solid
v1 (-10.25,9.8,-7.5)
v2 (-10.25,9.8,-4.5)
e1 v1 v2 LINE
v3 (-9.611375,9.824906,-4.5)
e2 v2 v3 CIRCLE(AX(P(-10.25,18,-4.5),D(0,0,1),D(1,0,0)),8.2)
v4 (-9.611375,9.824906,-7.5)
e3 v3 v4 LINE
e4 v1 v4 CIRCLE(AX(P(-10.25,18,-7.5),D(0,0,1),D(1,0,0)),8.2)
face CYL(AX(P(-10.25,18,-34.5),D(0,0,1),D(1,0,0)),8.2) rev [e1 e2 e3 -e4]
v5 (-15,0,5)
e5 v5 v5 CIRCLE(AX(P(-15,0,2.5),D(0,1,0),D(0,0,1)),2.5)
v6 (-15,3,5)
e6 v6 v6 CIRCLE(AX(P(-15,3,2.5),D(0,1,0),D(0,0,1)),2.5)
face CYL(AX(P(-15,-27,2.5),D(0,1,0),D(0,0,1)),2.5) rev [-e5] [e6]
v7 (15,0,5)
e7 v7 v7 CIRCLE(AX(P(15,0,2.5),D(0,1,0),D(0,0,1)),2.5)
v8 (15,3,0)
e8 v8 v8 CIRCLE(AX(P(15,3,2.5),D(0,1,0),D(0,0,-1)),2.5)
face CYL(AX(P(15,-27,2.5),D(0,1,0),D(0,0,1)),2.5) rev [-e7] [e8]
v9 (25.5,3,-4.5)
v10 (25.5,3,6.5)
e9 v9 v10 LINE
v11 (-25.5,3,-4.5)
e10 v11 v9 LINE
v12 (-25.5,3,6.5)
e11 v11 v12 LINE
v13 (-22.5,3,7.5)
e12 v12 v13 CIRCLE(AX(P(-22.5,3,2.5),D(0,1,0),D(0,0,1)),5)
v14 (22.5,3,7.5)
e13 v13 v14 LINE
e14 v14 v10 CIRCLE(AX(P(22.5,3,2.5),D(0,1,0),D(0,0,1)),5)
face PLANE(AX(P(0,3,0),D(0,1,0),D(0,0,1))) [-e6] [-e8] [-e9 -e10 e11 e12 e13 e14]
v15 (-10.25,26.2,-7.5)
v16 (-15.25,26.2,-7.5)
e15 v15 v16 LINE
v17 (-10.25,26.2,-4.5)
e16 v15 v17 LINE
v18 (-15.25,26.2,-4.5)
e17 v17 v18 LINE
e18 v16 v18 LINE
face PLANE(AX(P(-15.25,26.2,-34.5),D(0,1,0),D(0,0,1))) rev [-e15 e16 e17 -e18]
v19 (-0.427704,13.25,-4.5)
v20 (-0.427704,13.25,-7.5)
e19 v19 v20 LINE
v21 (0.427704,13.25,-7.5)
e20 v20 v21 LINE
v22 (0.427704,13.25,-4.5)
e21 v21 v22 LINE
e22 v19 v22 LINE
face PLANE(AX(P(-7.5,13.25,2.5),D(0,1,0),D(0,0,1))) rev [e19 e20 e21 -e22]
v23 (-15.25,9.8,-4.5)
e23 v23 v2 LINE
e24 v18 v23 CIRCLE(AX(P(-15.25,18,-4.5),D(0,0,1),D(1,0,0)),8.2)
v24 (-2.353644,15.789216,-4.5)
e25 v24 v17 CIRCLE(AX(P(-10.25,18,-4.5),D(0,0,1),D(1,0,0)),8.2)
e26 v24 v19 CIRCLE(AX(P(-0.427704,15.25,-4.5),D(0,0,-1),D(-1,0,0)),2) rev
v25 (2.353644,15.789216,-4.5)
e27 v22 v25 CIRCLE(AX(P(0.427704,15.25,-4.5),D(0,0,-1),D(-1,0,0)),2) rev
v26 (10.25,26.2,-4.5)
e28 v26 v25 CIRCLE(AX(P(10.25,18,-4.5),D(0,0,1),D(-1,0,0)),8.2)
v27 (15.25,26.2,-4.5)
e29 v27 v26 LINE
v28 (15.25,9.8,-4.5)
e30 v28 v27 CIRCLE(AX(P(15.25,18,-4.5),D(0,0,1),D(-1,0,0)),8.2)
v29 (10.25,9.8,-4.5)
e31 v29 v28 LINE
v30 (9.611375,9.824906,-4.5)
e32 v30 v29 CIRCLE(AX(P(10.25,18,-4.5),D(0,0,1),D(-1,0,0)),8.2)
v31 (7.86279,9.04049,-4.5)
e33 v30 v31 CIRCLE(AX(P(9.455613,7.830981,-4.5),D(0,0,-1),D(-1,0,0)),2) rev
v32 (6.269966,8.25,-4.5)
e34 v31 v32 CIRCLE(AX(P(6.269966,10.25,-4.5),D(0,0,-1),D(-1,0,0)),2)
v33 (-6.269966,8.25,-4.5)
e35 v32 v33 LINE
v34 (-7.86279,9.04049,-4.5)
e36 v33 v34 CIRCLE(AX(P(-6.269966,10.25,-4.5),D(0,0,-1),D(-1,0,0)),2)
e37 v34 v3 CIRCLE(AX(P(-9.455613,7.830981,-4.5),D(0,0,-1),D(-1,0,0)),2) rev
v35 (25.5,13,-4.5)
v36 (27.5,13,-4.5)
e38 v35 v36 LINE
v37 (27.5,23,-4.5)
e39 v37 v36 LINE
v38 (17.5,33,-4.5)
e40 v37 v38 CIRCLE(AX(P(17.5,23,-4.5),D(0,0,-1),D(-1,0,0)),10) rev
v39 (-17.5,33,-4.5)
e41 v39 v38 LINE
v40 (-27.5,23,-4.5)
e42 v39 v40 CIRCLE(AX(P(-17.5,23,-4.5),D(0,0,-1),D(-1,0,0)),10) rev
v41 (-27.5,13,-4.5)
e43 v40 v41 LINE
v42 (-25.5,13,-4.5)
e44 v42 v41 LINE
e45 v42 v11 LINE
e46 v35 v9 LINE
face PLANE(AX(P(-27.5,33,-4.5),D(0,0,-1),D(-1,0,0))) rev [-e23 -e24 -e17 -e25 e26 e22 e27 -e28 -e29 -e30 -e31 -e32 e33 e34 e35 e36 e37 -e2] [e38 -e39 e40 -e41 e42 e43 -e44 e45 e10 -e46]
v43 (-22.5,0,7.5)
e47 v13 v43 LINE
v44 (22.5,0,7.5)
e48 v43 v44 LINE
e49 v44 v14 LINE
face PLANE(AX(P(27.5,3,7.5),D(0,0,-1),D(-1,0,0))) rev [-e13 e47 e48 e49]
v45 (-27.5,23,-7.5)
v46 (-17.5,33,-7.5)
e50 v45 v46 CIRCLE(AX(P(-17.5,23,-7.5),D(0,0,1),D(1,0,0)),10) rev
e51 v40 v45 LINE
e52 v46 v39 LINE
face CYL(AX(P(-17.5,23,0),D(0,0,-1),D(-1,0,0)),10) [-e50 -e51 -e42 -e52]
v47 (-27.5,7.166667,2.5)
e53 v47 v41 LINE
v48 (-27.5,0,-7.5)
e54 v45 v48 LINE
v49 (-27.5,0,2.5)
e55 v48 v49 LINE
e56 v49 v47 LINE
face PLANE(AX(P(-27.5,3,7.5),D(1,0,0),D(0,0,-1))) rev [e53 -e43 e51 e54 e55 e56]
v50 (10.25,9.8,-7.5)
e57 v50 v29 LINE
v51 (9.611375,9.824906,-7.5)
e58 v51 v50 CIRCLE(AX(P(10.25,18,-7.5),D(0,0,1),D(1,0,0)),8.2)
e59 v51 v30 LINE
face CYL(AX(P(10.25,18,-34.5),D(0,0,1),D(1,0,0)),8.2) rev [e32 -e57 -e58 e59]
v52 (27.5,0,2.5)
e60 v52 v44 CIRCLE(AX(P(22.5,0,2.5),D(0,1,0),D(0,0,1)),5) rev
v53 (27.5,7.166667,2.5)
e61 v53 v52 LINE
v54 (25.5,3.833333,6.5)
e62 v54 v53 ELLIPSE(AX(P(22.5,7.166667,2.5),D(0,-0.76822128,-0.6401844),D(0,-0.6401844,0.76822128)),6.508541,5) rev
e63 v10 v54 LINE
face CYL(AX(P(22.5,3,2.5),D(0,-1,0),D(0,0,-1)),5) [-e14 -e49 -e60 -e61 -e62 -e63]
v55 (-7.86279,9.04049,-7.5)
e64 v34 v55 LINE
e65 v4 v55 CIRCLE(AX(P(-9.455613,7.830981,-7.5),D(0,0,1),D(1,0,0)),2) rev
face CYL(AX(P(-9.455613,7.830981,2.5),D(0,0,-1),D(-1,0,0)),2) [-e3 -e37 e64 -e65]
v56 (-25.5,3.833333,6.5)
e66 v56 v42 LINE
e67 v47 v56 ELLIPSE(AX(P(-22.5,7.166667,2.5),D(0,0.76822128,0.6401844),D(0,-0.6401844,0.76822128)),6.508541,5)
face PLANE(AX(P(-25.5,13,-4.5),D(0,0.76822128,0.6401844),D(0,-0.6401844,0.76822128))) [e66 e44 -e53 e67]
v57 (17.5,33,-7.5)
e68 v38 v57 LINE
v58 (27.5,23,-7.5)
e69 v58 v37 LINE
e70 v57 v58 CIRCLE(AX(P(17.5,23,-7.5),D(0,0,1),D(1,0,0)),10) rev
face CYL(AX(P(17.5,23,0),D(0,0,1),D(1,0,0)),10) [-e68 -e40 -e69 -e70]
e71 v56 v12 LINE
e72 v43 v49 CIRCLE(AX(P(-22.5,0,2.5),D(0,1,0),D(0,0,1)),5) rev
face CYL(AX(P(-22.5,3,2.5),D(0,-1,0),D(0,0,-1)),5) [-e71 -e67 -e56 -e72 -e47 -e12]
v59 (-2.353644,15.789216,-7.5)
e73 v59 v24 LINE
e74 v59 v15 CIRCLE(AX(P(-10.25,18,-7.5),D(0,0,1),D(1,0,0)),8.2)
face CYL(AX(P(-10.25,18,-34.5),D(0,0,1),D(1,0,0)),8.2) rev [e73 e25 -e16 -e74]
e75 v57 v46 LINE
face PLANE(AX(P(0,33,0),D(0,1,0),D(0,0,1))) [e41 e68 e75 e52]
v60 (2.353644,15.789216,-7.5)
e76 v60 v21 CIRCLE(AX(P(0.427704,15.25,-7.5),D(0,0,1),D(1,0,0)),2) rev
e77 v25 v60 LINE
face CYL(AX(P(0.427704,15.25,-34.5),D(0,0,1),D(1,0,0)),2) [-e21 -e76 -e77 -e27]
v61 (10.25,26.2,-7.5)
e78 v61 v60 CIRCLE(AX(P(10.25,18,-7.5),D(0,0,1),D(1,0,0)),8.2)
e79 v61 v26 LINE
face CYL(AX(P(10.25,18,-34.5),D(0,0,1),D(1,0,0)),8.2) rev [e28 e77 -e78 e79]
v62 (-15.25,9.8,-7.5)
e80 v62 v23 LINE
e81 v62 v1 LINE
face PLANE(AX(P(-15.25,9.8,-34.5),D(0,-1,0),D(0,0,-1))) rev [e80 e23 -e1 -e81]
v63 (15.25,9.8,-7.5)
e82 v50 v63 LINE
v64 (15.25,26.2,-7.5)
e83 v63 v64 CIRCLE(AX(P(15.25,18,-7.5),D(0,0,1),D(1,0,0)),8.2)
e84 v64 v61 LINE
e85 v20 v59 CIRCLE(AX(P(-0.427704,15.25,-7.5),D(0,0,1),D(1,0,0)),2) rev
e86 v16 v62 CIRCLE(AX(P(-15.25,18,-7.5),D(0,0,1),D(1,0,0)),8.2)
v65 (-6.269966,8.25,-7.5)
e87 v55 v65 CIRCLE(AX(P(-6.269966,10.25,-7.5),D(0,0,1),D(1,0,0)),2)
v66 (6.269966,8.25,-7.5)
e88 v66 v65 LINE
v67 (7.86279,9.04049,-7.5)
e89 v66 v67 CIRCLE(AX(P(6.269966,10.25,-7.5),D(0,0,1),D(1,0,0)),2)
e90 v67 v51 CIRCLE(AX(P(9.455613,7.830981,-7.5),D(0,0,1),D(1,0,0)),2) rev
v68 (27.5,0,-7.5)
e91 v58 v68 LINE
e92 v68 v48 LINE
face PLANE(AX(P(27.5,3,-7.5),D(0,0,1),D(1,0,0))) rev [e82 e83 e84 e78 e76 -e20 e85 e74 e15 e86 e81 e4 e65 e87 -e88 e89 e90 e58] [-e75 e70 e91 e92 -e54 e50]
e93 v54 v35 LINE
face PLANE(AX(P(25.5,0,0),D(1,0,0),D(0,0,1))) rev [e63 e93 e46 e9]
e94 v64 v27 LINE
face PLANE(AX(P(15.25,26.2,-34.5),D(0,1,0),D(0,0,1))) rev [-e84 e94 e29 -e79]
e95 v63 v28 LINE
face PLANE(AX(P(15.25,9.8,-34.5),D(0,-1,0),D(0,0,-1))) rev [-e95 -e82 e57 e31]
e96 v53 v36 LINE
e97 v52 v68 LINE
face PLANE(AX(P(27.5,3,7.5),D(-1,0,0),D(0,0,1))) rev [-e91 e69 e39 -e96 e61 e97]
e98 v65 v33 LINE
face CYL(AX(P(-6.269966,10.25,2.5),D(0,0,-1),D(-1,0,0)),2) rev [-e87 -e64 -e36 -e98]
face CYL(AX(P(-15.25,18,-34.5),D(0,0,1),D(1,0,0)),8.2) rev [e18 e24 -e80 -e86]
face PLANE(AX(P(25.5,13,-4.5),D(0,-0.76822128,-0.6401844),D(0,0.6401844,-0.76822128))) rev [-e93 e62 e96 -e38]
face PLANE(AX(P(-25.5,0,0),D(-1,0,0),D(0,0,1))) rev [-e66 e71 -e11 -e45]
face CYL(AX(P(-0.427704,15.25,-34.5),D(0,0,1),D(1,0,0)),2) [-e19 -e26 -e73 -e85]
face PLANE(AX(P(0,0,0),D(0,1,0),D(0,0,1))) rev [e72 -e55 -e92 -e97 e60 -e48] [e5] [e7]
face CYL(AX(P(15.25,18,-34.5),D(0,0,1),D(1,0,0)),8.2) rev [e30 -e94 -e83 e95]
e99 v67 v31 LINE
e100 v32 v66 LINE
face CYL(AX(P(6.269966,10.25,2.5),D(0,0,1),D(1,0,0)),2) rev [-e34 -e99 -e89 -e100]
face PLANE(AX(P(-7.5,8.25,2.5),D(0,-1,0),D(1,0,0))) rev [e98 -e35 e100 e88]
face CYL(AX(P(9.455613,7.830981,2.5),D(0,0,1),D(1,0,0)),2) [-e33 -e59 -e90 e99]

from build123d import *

# Parameters (mm, degrees)
SKETCH1_W           = 55
SKETCH1_H           = 15
BOSS_EXTRUDE1_DEPTH = 3
SKETCH2_W           = 55
SKETCH2_H           = 3
BOSS_EXTRUDE2_DEPTH = 30
CUT_EXTRUDE1_DEPTH  = 30
SKETCH4_R           = 2.5
CUT_EXTRUDE2_DEPTH  = 30
BOSS_EXTRUDE3_DEPTH = 2
FILLET1_R           = 10
SKETCH6_W           = 15
SKETCH6_H           = 5
CUT_EXTRUDE3_DEPTH  = 10
FILLET2_R           = 2
FILLET3_R           = 2
FILLET4_R           = 2
FILLET5_R           = 5


with BuildPart() as part:
    # Sketch1 → Boss-Extrude1 (new body)
    with BuildSketch(Plane(origin=(0, 0, 0), x_dir=(1, 0, 0), z_dir=(0, 1, 0))):
        Rectangle(SKETCH1_W, SKETCH1_H)
    extrude(amount=BOSS_EXTRUDE1_DEPTH)

    # Sketch2 → Boss-Extrude2 (add)
    with BuildSketch(Plane(origin=(0, 3, 0), x_dir=(1, 0, 0), z_dir=(0, 1, 0))):
        with Locations((0, 6)):
            Rectangle(SKETCH2_W, SKETCH2_H)
    extrude(amount=BOSS_EXTRUDE2_DEPTH)

    # Sketch3 → Cut-Extrude1 (cut)
    with BuildSketch(Plane.XY.offset(-4.5)):
        with BuildLine():
            Line((-15.25, 26.2), (-10.25, 26.2))
            ThreePointArc((-10.25, 26.2), (-2.05, 18), (-10.25, 9.8))
            Line((-10.25, 9.8), (-15.25, 9.8))
            ThreePointArc((-15.25, 9.8), (-23.45, 18), (-15.25, 26.2))
        make_face()
        with BuildLine():
            Line((15.25, 26.2), (10.25, 26.2))
            ThreePointArc((10.25, 26.2), (2.05, 18), (10.25, 9.8))
            Line((10.25, 9.8), (15.25, 9.8))
            ThreePointArc((15.25, 9.8), (23.45, 18), (15.25, 26.2))
        make_face()
    extrude(amount=-CUT_EXTRUDE1_DEPTH, mode=Mode.SUBTRACT)

    # Sketch4 → Cut-Extrude2 (cut)
    with BuildSketch(Plane(origin=(0, 3, 0), x_dir=(1, 0, 0), z_dir=(0, 1, 0))):
        with Locations(Location((-15, -2.5, 0), (0, 0, 270))):
            Circle(SKETCH4_R)
        with Locations(Location((15, -2.5, 0), (0, 0, 270))):
            Circle(SKETCH4_R)
    extrude(amount=-CUT_EXTRUDE2_DEPTH, mode=Mode.SUBTRACT)

    # Sketch5 → Boss-Extrude3 (add)
    with BuildSketch(Plane.ZY.offset(27.5)):
        Polygon((7.5, 3), (-4.5, 3), (-4.5, 13), align=None)
    boss_extrude3 = extrude(amount=-BOSS_EXTRUDE3_DEPTH)

    # Mirror1: Boss-Extrude3 across plane
    add(boss_extrude3.mirror(Plane(origin=(0, 0, 0), x_dir=(0, 0, 1), z_dir=(1, 0, 0))))

    # Fillet1
    fillet1_edges = [part.edges().sort_by_distance(p)[0] for p in [
        (-27.5, 33, -6),
        (27.5, 33, -6),
    ]]
    fillet(fillet1_edges, radius=FILLET1_R)

    # Sketch6 → Cut-Extrude3 (cut)
    with BuildSketch(Plane(origin=(0, 0, -7.5), x_dir=(-1, 0, 0), z_dir=(0, 0, -1))):
        with Locations((0, 10.75)):
            Rectangle(SKETCH6_W, SKETCH6_H)
    extrude(amount=-CUT_EXTRUDE3_DEPTH, mode=Mode.SUBTRACT)

    # Fillet2
    # the kernel refuses this fillet: 2 mm, written as the material it takes off along each edge
    with BuildSketch(Plane(origin=(-7.5, 10.274878642, -12.896978856), x_dir=(0, -1, 0), z_dir=(0, 0, 1))) as fillet2_piece_1:
        with BuildLine():
            CenterArc((2.443897749, -1.9556132), FILLET2_R, 102.093612403, 82.373166868)
            Line((0.449972434, -2.111375318), (0.410093928, -2.11449056))
            ThreePointArc((0.410093928, -2.11449056), (0.255650409, -1.049152563), (-0.037683519, -0.013414634))
            Line((-0.037683519, -0.013414634), (0, 0.04))
            ThreePointArc((0, 0.04), (1.012439321, 0.04), (2.01649826, 0.039112264))
            Line((2.01649826, 0.039112264), (2.024878642, 0))
        make_face()
    extrude(amount=13.793957711, mode=Mode.SUBTRACT)
    with BuildSketch(Plane(origin=(7.5, 10.274878642, -12.896978856), x_dir=(0.9780357557406035, -0.2084371859647568, 0), z_dir=(0, 0, 1))) as fillet2_piece_2:
        with BuildLine():
            CenterArc((2.422058804, -1.98259687), FILLET2_R, 97.564003787, 82.373166868)
            Line((0.422060006, -1.980403713), (0.38206003, -1.980359849))
            ThreePointArc((0.38206003, -1.980359849), (0.171908573, -0.998539344), (-0.03912143, -0.008337487))
            Line((-0.03912143, -0.008337487), (0.005265345, 0.039651937))
            ThreePointArc((0.005265345, 0.039651937), (1.079395771, -0.031352833), (2.153526197, 0.039651937))
            Line((2.153526197, 0.039651937), (2.158791542, 0))
        make_face()
    extrude(amount=13.793957711, mode=Mode.SUBTRACT)

    # Fillet3
    fillet3_edges = [part.edges().sort_by_distance(p)[0] for p in [
        (-3.565877021, 13.25, -6),
        (3.565877021, 13.25, -6),
    ]]
    fillet(fillet3_edges, radius=FILLET3_R)

    # Fillet4
    fillet4_edges = [part.edges().sort_by_distance(p)[0] for p in [
        (-7.5, 8.25, -6),
        (7.5, 8.25, -6),
    ]]
    fillet(fillet4_edges, radius=FILLET4_R)

    # Fillet5
    # the kernel refuses this fillet: 5 mm, written as the material it takes off along each edge
    with BuildSketch(Plane(origin=(27.5, -12.5, 7.5), x_dir=(0, 0, -1), z_dir=(0, 1, 0))) as fillet5_piece_1:
        with BuildLine():
            CenterArc((FILLET5_R, FILLET5_R), FILLET5_R, 180, 90)
            Line((0, FILLET5_R), (0, 0))
            Line((0, 0), (FILLET5_R, 0))
        make_face()
    extrude(amount=28, mode=Mode.SUBTRACT)
    with BuildSketch(Plane(origin=(-27.5, -12.5, 7.5), x_dir=(0, 0, -1), z_dir=(0, 1, 0))) as fillet5_piece_2:
        with BuildLine():
            CenterArc((FILLET5_R, -FILLET5_R), FILLET5_R, 90, 90)
            Line((0, -FILLET5_R), (0, 0))
            Line((0, 0), (FILLET5_R, 0))
        make_face()
    extrude(amount=28, mode=Mode.SUBTRACT)


solid = part.part
